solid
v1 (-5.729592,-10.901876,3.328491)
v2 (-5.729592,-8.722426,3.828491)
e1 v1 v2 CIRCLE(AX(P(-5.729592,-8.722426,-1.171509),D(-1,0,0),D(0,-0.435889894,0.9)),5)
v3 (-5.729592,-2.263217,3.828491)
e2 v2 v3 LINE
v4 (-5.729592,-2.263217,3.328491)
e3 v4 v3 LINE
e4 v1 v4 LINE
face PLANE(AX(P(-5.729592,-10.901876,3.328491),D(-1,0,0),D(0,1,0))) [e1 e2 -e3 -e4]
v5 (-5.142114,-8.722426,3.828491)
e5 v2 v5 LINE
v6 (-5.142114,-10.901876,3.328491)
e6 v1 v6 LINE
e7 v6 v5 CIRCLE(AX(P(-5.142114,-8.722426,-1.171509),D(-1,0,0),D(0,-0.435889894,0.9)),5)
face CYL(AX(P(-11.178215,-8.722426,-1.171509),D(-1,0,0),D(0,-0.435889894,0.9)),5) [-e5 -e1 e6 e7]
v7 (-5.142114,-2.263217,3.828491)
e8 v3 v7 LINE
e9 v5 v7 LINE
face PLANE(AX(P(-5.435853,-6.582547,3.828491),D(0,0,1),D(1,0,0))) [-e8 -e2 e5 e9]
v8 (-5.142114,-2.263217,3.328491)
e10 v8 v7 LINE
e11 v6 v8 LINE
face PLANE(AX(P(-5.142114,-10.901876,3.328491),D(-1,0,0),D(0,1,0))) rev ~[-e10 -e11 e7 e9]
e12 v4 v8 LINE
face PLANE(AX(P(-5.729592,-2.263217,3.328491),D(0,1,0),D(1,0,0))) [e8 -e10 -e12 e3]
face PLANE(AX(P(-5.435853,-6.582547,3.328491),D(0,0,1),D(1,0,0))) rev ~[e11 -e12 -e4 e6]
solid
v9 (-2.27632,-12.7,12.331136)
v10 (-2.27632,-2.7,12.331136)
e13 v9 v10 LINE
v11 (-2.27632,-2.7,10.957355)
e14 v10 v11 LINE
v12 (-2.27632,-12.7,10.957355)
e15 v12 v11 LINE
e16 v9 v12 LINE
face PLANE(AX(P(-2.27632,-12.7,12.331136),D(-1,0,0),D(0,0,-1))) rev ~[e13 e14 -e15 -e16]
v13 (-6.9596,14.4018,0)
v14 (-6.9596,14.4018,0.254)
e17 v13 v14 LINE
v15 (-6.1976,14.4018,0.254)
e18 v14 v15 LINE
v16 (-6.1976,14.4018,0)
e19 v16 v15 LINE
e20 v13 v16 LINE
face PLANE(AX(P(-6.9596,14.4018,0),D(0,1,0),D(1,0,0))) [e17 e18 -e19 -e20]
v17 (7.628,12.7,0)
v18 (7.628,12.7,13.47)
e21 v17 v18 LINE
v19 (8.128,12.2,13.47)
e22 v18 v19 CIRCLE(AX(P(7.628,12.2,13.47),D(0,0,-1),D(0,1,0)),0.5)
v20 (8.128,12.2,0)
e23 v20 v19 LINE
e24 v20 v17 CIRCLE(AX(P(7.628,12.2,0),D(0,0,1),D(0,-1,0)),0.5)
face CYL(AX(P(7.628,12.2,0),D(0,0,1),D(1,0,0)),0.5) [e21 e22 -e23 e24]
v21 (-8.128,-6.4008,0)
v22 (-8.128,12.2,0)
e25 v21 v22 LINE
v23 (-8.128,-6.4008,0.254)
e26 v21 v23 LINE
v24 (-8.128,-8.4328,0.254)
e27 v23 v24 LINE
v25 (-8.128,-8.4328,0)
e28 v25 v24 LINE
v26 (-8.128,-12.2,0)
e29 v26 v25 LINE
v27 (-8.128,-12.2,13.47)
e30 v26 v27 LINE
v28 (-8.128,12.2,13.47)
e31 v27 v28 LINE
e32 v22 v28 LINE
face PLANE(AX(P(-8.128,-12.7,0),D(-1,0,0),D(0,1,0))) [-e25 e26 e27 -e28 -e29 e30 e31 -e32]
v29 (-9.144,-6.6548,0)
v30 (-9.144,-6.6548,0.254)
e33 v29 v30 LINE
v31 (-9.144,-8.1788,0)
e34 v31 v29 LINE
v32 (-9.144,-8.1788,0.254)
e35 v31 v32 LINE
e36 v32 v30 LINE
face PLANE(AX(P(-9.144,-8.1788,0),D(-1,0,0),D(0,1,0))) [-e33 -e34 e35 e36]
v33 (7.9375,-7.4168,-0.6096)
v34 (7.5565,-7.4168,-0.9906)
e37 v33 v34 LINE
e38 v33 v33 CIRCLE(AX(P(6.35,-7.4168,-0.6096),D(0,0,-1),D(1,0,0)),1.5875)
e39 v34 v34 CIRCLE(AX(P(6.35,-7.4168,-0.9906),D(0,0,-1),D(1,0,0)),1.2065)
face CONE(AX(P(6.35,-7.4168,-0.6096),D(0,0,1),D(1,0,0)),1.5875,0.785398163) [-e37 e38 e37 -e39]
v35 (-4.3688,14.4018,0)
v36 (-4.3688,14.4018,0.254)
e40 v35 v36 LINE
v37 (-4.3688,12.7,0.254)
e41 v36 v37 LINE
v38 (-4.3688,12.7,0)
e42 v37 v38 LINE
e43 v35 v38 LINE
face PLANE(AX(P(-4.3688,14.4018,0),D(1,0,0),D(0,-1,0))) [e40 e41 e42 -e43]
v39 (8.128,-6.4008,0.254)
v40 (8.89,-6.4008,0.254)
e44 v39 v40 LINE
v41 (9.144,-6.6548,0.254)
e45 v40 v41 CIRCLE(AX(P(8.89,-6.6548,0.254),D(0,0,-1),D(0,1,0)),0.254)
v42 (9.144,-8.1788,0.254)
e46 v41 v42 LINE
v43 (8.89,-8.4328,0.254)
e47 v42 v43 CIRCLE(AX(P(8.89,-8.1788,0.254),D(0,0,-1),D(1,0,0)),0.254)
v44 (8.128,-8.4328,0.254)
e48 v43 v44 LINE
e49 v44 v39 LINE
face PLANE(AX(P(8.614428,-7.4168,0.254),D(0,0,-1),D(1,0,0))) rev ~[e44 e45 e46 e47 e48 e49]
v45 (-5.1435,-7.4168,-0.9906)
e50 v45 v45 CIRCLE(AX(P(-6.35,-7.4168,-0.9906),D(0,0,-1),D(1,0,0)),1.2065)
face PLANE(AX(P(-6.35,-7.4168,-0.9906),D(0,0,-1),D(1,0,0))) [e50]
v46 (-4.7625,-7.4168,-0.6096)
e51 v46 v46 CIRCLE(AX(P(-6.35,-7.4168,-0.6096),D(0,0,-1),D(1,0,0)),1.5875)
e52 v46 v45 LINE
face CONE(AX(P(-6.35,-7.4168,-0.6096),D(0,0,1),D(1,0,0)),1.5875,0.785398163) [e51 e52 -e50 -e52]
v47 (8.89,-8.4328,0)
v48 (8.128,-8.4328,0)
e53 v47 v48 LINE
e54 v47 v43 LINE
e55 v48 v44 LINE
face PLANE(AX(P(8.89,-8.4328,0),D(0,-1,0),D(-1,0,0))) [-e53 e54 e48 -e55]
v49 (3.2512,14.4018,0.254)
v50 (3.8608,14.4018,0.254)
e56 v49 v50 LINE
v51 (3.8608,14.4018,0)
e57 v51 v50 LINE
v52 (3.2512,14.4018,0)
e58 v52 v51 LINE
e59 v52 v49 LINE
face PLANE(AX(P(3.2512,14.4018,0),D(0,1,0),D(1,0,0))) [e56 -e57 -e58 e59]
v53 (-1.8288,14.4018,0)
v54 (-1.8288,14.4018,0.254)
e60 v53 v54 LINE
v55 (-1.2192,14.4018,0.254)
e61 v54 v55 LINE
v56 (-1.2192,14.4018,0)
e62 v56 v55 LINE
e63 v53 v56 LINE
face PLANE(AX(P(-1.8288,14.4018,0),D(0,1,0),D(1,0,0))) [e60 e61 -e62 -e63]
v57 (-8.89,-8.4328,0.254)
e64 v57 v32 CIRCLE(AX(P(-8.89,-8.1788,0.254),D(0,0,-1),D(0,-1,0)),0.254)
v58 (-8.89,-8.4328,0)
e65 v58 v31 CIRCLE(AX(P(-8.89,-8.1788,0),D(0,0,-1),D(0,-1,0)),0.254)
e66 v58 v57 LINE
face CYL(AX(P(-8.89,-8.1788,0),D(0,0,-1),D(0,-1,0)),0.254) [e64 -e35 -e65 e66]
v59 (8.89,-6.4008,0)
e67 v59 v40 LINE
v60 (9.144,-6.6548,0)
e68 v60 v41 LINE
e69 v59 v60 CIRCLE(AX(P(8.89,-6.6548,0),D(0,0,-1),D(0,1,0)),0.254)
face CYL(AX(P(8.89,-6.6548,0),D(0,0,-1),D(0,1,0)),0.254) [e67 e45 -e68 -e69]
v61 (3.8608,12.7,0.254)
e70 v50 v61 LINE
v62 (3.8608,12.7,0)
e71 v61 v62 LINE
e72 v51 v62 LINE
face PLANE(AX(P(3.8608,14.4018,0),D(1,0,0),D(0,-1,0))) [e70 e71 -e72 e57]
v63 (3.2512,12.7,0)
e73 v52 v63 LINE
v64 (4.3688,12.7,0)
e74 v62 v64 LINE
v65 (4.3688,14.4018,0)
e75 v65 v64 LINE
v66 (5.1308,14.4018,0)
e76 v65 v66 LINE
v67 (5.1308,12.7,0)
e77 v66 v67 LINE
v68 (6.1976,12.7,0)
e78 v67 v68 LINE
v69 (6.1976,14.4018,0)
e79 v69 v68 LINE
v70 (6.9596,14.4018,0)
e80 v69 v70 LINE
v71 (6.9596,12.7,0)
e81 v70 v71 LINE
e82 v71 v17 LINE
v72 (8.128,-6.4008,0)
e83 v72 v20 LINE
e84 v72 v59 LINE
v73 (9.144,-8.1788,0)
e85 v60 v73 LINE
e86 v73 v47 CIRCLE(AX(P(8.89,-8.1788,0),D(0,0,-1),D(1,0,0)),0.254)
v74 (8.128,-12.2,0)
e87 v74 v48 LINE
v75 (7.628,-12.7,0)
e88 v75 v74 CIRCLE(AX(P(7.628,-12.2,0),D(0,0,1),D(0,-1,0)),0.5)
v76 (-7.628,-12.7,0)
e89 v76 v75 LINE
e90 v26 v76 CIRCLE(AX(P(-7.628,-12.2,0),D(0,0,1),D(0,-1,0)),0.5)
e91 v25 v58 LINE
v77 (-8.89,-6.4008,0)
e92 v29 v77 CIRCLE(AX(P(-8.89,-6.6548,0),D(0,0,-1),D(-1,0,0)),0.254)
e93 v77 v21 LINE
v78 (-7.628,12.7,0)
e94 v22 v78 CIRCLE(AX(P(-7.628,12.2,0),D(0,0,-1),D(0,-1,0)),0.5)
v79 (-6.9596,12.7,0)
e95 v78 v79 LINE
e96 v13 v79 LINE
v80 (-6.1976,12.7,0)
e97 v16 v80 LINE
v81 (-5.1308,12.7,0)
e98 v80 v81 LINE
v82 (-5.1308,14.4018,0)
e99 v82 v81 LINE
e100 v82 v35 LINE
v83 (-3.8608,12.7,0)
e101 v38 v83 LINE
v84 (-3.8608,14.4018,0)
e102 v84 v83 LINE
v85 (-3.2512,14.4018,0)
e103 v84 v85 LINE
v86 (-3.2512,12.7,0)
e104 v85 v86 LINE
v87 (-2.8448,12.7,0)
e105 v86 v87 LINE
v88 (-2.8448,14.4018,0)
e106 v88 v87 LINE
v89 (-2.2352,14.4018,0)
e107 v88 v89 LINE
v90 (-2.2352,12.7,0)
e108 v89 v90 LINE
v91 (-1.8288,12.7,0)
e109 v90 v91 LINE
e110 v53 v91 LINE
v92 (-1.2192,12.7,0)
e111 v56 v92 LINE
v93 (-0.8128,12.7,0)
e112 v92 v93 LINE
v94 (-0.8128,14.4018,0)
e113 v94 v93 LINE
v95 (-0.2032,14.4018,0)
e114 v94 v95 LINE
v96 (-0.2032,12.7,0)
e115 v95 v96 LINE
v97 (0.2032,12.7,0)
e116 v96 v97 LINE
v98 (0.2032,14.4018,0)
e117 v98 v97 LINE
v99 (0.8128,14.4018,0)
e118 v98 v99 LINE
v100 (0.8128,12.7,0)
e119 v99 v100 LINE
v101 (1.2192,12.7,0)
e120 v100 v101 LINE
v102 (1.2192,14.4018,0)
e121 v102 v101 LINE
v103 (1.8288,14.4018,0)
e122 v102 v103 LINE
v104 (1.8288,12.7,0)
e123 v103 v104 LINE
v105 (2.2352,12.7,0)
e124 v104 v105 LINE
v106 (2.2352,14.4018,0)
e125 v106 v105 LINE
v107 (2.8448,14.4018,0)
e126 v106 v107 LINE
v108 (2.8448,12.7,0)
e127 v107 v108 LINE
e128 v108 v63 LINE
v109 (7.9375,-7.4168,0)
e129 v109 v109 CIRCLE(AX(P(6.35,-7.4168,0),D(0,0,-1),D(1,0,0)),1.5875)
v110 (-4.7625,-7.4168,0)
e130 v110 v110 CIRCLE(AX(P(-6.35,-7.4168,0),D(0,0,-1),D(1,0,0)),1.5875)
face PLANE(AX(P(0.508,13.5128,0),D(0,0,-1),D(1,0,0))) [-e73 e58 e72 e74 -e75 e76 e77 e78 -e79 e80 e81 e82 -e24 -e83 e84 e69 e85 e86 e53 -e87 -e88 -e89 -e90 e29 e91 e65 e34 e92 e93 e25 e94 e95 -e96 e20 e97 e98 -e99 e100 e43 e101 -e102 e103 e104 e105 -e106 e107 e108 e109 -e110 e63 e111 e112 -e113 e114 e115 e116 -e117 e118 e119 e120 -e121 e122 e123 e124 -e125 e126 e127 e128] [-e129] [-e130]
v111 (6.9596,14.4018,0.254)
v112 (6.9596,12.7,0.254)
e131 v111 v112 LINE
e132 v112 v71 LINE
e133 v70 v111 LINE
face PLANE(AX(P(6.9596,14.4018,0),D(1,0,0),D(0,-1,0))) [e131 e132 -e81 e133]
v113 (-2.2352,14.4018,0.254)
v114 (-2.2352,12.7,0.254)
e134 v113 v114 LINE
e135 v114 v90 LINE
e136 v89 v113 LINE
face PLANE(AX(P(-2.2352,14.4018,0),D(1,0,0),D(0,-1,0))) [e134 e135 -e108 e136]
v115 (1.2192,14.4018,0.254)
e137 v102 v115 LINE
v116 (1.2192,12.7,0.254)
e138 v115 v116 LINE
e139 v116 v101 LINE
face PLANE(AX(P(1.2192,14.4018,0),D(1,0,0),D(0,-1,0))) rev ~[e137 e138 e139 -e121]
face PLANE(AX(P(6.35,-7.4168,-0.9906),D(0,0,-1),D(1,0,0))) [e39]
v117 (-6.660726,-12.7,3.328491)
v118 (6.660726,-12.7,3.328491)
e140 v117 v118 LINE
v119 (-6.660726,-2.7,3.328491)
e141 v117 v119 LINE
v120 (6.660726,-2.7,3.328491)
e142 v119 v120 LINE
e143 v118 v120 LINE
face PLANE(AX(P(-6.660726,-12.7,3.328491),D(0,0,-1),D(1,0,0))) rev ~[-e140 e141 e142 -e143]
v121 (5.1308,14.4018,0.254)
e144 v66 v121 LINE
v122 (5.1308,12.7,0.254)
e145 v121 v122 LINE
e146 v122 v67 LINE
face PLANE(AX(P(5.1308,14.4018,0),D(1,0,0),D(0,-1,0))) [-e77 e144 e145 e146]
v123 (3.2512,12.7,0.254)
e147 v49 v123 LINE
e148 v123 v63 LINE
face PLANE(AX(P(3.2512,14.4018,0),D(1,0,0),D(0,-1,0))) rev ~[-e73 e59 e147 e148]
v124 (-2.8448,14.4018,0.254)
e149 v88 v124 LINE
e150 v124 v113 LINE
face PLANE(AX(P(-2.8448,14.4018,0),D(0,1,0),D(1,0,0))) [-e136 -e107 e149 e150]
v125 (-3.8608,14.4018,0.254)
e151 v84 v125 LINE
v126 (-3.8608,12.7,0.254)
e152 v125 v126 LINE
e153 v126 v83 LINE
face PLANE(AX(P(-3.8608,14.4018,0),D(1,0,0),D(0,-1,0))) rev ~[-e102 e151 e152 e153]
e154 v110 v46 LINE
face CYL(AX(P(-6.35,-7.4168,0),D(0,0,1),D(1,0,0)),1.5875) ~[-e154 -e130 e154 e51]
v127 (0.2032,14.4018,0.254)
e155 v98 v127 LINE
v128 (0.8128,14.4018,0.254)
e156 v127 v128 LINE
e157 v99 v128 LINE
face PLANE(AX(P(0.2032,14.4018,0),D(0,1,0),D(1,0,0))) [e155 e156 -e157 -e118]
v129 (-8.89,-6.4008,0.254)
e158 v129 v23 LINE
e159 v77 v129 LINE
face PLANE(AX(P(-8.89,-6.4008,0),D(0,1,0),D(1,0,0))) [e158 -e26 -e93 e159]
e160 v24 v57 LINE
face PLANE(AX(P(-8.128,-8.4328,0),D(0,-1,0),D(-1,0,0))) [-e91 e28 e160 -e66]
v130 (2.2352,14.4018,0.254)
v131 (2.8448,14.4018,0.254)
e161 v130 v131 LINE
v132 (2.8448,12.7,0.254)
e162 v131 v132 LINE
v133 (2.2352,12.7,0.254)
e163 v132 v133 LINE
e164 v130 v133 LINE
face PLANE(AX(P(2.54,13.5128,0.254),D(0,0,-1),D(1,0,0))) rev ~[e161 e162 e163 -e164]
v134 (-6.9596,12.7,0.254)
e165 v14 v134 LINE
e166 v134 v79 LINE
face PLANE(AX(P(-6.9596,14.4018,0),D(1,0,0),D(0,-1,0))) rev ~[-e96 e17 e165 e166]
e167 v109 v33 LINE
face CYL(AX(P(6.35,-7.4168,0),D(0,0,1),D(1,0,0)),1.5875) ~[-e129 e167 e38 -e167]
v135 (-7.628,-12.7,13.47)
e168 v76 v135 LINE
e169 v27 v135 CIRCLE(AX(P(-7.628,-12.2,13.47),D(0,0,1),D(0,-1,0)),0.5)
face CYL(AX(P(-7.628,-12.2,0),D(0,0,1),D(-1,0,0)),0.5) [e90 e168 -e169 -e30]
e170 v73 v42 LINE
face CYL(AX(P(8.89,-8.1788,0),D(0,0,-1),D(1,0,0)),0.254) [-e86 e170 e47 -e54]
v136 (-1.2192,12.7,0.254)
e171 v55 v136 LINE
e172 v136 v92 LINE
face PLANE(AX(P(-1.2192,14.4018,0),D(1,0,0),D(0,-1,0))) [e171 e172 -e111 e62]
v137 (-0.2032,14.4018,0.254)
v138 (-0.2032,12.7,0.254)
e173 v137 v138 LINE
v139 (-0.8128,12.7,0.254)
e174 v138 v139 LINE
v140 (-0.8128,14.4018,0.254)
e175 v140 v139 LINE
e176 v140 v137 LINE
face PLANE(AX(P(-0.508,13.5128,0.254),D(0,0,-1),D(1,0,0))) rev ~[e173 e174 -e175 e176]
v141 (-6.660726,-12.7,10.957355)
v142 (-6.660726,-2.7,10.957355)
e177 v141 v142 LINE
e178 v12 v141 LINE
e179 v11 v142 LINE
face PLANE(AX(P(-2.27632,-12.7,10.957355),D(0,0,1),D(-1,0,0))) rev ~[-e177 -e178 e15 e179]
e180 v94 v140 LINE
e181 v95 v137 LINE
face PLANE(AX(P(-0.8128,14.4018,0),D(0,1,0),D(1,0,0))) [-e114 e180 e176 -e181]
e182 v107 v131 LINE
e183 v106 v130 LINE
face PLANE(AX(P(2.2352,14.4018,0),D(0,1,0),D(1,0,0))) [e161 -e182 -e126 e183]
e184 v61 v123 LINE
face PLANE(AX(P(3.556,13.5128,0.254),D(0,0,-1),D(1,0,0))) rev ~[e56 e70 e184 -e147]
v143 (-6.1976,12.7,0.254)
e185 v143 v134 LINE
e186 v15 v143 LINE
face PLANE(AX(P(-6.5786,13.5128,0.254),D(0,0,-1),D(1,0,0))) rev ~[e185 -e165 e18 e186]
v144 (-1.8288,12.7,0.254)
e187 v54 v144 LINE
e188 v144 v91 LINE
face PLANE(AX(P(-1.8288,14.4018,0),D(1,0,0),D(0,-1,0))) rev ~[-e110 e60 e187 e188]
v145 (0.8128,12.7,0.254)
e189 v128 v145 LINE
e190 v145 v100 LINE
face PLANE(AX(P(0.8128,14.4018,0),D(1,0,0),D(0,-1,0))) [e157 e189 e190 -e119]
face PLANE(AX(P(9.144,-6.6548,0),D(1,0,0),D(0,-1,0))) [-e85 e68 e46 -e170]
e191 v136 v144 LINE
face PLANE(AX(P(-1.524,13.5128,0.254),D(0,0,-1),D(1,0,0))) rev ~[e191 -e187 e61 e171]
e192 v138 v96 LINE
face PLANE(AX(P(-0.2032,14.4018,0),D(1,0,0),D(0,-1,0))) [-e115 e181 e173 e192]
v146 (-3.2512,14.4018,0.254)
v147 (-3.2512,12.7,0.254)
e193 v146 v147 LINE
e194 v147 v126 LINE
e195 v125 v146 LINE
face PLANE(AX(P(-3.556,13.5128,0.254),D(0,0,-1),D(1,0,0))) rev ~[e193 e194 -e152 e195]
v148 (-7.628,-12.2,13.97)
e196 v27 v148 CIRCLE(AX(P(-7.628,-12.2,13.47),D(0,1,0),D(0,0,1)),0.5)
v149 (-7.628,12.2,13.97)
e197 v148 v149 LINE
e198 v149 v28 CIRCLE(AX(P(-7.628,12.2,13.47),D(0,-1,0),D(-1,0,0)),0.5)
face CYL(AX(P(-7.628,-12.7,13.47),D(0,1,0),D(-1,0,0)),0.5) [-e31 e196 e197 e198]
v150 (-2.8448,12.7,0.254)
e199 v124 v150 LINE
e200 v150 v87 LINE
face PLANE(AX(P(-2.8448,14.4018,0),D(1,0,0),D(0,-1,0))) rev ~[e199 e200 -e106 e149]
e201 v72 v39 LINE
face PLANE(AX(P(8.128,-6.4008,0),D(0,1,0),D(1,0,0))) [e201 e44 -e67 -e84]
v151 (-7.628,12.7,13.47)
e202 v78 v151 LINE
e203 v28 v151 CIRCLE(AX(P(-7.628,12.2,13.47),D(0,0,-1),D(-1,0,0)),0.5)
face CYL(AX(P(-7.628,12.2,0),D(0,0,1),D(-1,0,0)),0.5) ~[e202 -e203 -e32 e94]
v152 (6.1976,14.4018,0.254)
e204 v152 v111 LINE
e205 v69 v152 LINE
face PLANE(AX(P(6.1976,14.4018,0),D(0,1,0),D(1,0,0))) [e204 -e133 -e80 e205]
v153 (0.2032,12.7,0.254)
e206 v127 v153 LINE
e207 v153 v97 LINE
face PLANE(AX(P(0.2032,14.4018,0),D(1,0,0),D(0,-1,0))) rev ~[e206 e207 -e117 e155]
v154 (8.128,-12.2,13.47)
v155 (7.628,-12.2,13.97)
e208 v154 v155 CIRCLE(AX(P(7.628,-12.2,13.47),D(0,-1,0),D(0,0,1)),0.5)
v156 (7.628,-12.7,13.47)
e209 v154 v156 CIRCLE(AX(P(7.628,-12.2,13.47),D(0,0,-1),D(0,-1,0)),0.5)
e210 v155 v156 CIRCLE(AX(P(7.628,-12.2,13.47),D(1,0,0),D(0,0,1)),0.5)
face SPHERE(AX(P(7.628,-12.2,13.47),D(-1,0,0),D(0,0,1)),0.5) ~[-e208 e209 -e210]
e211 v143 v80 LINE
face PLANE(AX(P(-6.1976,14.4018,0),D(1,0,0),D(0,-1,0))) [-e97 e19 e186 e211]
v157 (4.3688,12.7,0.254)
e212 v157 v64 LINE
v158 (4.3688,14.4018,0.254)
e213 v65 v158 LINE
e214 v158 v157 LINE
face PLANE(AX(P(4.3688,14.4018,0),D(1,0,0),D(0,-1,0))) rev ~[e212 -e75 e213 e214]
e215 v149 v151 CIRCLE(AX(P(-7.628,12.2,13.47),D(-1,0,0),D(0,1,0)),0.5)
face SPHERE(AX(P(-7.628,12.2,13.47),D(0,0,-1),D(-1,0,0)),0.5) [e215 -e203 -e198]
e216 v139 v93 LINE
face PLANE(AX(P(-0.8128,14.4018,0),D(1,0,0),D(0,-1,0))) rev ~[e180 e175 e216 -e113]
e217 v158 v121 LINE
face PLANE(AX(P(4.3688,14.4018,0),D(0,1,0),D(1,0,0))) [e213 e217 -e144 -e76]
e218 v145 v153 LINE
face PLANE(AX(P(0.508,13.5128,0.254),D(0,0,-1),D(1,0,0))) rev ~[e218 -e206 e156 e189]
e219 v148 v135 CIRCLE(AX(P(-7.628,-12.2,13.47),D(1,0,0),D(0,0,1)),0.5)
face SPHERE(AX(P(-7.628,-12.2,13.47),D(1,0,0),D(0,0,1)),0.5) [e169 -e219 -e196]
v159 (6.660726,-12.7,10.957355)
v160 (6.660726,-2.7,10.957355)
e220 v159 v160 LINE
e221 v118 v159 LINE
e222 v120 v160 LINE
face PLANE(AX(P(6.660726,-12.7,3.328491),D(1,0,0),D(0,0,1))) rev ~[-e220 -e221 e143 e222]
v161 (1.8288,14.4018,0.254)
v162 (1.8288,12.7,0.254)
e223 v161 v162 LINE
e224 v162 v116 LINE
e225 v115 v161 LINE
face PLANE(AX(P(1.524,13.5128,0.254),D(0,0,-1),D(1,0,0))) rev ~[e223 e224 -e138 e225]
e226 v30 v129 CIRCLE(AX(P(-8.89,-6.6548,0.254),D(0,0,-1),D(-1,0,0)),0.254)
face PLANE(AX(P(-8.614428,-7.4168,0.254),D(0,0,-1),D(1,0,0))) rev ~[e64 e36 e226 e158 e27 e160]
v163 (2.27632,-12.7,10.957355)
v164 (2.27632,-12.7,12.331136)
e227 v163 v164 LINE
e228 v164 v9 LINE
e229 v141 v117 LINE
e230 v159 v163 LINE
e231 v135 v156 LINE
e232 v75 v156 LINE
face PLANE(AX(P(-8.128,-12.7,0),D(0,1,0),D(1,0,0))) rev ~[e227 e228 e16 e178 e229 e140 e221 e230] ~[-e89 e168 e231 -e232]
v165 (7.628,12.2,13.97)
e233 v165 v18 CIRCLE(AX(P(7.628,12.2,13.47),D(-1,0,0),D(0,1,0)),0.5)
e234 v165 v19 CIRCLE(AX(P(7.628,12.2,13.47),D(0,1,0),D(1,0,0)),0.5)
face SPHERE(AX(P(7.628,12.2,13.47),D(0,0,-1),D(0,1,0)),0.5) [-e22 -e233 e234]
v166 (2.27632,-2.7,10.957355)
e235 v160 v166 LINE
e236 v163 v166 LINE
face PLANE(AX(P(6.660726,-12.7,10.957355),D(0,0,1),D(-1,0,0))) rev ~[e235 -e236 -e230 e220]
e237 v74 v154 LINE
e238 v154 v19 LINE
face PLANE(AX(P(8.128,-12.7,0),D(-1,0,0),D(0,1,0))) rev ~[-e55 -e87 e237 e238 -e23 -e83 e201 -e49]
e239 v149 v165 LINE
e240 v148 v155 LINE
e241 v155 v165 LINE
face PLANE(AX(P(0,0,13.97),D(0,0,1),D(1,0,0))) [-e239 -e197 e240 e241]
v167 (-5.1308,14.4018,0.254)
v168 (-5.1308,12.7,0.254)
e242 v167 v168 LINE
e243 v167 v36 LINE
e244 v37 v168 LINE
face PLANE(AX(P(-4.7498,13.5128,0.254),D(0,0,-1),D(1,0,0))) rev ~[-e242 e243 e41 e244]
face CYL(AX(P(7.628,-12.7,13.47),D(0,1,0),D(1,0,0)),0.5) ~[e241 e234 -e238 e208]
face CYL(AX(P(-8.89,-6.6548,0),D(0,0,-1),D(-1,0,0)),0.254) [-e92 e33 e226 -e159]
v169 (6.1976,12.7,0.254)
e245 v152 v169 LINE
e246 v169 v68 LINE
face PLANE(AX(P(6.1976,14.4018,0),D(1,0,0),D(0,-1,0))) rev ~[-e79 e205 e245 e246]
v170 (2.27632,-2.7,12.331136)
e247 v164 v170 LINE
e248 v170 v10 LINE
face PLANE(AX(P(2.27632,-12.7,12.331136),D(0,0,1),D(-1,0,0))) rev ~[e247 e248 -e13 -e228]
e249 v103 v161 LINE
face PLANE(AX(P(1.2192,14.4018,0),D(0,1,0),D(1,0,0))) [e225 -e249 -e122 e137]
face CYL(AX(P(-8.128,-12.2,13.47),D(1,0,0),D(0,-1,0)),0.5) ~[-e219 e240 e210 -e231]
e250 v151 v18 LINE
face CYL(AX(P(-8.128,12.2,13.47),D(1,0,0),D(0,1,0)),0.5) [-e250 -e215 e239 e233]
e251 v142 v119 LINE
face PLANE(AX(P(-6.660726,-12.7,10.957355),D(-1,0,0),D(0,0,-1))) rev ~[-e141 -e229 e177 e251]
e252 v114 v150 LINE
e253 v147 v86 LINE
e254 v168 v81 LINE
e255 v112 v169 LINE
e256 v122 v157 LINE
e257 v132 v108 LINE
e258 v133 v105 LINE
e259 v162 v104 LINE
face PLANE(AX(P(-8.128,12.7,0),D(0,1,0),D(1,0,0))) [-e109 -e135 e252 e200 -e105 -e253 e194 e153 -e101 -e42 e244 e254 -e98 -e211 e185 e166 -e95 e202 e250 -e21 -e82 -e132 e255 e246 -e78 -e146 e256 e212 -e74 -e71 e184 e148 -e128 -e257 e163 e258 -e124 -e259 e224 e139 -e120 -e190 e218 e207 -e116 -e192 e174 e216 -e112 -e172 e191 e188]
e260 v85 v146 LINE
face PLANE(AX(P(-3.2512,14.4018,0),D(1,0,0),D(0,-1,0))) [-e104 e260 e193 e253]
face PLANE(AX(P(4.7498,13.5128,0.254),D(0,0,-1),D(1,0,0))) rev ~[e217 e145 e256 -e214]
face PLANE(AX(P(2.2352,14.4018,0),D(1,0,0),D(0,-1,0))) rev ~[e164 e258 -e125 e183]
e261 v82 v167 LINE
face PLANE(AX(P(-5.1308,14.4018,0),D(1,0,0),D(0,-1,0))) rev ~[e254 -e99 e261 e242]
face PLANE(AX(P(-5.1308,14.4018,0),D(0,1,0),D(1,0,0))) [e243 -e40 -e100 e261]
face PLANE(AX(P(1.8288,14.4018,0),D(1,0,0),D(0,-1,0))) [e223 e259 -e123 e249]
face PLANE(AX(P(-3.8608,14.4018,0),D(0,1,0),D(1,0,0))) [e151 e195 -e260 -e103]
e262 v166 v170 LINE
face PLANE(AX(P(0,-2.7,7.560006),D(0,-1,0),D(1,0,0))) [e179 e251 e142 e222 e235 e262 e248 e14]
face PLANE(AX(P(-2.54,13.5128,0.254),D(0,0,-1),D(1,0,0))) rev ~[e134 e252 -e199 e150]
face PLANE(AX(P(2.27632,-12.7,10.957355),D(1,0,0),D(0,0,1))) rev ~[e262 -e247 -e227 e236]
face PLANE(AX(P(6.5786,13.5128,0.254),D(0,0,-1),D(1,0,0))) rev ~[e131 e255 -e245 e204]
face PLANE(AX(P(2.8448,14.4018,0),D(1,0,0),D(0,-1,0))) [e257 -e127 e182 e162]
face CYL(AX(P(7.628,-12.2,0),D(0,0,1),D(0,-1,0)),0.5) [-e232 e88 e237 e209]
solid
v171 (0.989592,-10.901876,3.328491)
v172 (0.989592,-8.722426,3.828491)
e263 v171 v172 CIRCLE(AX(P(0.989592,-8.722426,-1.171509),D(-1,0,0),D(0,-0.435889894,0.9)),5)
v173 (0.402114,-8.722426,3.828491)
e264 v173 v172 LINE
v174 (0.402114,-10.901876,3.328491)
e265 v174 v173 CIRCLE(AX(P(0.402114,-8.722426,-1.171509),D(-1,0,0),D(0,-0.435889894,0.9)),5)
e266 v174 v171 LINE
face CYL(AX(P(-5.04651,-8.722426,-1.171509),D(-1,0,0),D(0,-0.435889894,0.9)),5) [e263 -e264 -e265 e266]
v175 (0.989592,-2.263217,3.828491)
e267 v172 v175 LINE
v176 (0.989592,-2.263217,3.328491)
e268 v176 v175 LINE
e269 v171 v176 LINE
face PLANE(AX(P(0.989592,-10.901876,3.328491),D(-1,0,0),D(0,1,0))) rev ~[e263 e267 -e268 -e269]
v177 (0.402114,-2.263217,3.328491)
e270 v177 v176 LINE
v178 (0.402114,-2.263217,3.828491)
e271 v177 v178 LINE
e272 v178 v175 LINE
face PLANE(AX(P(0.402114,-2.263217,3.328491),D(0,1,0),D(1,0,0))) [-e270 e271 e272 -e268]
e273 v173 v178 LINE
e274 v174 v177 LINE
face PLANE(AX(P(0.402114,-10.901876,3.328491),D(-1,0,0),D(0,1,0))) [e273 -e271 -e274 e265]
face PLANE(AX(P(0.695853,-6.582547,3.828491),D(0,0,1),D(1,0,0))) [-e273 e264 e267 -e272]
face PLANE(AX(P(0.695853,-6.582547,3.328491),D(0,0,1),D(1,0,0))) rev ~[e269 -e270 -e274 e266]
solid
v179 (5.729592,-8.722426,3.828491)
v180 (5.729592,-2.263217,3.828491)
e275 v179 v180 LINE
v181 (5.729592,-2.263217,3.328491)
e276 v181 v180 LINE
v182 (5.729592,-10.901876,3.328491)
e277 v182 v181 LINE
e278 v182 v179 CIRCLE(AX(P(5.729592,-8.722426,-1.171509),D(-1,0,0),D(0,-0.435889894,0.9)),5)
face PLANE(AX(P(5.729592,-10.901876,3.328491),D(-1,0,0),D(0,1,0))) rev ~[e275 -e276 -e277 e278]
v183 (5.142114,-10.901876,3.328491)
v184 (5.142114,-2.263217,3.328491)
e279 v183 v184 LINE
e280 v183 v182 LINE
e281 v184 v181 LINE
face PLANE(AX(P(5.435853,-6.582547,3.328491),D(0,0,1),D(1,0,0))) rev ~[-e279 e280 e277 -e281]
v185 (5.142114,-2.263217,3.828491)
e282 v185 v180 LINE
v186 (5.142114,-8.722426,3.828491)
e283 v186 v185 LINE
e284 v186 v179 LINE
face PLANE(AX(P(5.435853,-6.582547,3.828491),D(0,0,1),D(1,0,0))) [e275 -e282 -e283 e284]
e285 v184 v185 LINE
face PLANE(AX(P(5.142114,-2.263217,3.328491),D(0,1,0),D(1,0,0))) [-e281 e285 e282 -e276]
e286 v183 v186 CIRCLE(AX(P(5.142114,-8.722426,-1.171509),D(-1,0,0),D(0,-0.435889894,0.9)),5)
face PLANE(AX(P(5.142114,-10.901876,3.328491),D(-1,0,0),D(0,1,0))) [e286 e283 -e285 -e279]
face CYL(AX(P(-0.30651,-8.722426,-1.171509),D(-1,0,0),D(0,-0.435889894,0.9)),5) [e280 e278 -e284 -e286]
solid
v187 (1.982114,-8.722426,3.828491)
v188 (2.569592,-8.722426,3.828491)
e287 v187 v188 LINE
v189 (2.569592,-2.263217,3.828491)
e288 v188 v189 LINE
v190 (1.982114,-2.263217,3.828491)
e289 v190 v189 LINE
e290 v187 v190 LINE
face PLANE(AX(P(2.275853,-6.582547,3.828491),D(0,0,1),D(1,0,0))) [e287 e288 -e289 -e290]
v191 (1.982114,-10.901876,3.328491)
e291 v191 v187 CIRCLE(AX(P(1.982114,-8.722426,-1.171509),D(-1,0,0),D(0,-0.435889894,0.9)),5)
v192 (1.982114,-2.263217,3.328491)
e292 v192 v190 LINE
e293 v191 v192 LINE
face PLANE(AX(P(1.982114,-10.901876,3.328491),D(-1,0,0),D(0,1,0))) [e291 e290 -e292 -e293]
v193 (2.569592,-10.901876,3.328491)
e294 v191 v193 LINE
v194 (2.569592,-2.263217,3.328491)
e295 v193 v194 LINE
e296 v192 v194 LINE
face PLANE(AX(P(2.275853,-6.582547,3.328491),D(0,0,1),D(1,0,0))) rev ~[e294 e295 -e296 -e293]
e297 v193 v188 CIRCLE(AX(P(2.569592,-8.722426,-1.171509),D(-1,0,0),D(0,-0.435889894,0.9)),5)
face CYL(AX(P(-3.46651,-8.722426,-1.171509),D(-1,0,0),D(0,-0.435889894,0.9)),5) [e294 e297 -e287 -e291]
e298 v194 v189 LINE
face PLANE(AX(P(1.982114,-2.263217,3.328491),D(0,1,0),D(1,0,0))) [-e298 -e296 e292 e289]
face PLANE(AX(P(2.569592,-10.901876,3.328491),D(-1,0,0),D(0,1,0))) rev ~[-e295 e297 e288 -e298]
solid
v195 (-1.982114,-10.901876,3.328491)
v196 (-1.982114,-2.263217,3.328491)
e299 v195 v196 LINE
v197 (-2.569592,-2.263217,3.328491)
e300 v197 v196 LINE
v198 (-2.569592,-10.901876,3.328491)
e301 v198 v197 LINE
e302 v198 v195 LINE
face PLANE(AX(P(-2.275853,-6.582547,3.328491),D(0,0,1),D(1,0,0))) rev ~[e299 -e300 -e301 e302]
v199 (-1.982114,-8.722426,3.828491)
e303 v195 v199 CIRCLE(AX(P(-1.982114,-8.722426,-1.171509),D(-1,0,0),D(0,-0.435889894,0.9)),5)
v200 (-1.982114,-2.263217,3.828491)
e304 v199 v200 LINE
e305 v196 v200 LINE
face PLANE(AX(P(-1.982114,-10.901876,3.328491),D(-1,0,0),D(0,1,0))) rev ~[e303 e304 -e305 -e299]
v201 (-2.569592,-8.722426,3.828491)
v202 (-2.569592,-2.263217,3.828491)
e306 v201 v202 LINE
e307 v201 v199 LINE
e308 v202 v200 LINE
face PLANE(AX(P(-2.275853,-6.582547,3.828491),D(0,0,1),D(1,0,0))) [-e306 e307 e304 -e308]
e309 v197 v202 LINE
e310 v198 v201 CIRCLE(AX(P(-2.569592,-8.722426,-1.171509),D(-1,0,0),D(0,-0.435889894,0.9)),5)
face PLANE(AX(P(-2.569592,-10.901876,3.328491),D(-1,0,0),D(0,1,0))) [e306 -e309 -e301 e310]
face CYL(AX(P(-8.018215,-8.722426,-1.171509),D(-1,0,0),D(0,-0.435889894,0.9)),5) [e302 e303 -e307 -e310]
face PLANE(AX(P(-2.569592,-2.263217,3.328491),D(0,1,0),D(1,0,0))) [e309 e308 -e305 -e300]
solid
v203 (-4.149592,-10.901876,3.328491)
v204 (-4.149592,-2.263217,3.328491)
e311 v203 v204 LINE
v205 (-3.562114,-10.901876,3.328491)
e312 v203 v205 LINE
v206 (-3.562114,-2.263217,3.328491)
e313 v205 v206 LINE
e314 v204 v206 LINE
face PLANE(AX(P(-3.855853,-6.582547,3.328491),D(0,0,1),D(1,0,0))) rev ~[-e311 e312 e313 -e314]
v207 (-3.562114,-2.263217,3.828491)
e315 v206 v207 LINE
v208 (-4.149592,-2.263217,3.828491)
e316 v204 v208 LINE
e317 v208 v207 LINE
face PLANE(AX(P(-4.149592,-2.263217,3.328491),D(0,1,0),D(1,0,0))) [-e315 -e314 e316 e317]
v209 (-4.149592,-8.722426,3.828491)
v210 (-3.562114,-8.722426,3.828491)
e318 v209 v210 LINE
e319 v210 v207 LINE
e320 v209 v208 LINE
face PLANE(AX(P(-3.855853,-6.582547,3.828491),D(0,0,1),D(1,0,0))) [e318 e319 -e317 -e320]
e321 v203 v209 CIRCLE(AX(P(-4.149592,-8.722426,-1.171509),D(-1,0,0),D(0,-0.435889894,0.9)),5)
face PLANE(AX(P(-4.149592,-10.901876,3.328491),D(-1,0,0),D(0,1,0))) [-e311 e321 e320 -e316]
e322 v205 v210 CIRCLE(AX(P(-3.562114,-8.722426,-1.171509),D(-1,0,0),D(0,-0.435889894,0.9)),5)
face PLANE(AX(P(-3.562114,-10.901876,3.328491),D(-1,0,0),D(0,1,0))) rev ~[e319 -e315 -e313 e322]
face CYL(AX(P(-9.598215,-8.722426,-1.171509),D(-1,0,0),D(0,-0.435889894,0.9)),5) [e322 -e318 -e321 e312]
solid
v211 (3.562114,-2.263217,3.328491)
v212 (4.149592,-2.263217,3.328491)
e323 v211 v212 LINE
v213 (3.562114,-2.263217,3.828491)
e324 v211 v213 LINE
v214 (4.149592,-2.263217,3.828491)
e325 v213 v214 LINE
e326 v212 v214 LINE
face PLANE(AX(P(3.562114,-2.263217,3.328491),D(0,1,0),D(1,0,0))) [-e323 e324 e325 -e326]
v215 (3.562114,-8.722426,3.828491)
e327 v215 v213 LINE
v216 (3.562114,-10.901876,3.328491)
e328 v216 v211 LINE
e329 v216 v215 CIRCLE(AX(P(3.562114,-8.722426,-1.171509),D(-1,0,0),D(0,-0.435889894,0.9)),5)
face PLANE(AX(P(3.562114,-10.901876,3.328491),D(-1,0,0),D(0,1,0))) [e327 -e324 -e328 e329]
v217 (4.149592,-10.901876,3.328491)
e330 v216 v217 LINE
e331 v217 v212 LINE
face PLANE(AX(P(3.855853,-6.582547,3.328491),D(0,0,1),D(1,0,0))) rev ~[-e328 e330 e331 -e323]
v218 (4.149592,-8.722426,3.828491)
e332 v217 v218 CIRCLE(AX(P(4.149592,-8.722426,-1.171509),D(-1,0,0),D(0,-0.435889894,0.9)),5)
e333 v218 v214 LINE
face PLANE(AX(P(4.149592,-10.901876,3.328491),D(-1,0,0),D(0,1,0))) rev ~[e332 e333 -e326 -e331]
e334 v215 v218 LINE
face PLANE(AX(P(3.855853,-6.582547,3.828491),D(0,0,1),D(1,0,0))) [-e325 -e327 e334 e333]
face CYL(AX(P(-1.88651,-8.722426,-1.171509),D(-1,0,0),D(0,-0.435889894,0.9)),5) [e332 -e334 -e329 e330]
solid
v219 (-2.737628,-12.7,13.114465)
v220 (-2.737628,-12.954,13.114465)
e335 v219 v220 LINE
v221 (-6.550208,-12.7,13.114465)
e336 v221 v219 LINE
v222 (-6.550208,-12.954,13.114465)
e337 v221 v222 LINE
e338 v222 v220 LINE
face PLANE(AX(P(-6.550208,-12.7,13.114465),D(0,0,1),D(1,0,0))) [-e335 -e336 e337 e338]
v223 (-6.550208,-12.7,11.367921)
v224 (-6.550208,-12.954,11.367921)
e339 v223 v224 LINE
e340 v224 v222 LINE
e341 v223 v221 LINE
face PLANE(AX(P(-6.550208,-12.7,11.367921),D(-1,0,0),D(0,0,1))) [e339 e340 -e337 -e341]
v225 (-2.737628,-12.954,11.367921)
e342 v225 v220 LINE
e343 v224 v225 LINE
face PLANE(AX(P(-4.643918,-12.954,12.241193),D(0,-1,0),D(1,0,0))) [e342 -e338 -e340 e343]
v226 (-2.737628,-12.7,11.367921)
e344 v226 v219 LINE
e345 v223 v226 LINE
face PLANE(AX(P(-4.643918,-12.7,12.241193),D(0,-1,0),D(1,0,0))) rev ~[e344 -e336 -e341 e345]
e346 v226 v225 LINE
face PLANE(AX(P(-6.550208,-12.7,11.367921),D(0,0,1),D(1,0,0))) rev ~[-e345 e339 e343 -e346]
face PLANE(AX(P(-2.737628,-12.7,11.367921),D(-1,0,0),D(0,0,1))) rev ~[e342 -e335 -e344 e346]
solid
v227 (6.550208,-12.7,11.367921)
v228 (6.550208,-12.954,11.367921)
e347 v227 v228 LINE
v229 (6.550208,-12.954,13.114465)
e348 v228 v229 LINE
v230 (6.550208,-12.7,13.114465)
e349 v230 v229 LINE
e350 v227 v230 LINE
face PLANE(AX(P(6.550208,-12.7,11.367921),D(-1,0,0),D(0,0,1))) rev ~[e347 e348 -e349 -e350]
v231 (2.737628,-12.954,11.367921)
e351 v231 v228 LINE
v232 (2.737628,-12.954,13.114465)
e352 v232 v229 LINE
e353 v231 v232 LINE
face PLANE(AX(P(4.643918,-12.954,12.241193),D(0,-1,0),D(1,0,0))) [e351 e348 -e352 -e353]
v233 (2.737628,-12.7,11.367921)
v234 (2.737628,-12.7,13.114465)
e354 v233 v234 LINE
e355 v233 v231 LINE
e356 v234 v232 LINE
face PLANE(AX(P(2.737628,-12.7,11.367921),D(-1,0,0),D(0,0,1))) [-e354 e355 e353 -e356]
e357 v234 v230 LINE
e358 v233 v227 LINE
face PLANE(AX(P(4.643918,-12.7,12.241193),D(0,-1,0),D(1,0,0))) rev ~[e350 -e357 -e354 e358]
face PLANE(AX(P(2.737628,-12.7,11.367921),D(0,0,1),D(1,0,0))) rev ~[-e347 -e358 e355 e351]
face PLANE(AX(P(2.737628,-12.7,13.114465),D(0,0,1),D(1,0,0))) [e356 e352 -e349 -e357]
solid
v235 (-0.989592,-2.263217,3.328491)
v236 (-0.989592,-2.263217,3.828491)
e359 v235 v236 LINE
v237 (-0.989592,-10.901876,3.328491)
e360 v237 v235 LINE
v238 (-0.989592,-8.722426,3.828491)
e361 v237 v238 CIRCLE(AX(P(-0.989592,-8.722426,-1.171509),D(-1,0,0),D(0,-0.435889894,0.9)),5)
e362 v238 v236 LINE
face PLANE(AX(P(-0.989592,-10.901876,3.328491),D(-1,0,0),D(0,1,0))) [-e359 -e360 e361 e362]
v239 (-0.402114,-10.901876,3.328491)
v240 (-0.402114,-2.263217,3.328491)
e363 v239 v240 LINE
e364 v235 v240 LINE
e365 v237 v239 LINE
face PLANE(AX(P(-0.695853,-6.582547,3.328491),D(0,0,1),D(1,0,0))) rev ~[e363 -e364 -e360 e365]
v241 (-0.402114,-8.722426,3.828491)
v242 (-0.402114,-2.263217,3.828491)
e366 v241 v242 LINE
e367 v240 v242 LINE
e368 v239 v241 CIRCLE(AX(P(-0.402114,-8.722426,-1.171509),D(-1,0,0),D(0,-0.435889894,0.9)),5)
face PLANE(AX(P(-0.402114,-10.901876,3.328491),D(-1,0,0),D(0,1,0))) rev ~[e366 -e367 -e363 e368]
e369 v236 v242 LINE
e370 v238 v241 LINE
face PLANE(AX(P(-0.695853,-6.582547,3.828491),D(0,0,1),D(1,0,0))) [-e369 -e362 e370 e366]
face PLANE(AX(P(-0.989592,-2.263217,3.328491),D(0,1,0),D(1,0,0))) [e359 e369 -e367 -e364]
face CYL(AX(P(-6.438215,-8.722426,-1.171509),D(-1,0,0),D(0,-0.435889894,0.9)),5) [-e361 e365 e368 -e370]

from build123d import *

# Parameters (mm, degrees)
F0_W          = 16.256
F0_H          = 25.4
F1_DEPTH      = 13.97
F2_R          = 0.5
F4_DEPTH      = 10
F5_W          = 0.5874776107
F5_H          = 8.6386585608
F6_DEPTH      = 0.5
F7_T1_DEPTH   = 11.4847249695
F7_2_T1_DEPTH = 11.4847249695
F7_3_T1_DEPTH = 11.4847249695
F7_4_T1_DEPTH = 11.4847249695
F7_5_T1_DEPTH = 11.4847249695
F7_6_T1_DEPTH = 11.4847249695
F7_7_T1_DEPTH = 11.4847249695
F7_8_T1_DEPTH = 11.4847249695
F8_R          = 1.5875
F9_DEPTH      = 0.9906
F10_W         = 0.6096
F10_H         = 1.778
F10_W_2       = 0.762
F11_DEPTH     = 0.254
F12_W         = 3.8125803694
F12_H         = 1.7465446144
F13_DEPTH     = 0.254
F14_SIZE      = 0.381


# Not quite as in the source:
# - a fillet or chamfer that OpenCascade refuses, or shapes differently, is made with other operations: its cross-section is extruded or revolved along the edge and cut away or added


with BuildPart() as f1:
    # F0 (on Top) → F1 (new body)
    with BuildSketch(Plane.XY):
        Rectangle(F0_W, F0_H)
    extrude(amount=F1_DEPTH)

    # F2
    f2_edges = [f1.edges().sort_by_distance(p)[0] for p in [
        (8.128, 12.7, 6.985),
        (-8.128, 12.7, 6.985),
        (0, -12.7, 13.97),
        (-8.128, 0, 13.97),
        (0, 12.7, 13.97),
        (8.128, 0, 13.97),
        (-8.128, -12.7, 6.985),
        (8.128, -12.7, 6.985),
    ]]
    fillet(f2_edges, radius=F2_R)

    # F3 (on face) → F4 (cut)
    with BuildSketch(Plane.XZ.offset(12.7)):
        Polygon((2.2763202433, 12.331135571), (0, 12.331135571), (-2.2763202433, 12.331135571), (-2.2763202433, 10.9573551454), (-6.6607256886, 10.9573551454), (-6.6607256886, 3.3284908859), (0, 3.3284908859), (6.6607256886, 3.3284908859), (6.6607256886, 10.9573551454), (2.2763202433, 10.9573551454), align=None)
    extrude(amount=-F4_DEPTH, mode=Mode.SUBTRACT)

    # F8 (on face) → F9 (join)
    with BuildSketch(Plane(origin=(0, 0, 0), x_dir=(1, 0, 0), z_dir=(0, 0, -1))):
        with Locations((6.35, 7.4168)):
            Circle(F8_R)
        with Locations((-6.35, 7.4168)):
            Circle(F8_R)
    extrude(amount=F9_DEPTH)

    # F10 (on face) → F11 (join)
    with BuildSketch(Plane(origin=(0, 0, 0), x_dir=(1, 0, 0), z_dir=(0, 0, -1))):
        with Locations((0.508, -13.5128)):
            Rectangle(F10_W, F10_H)
        with Locations((1.524, -13.5128)):
            Rectangle(F10_W, F10_H)
        with Locations((2.54, -13.5128)):
            Rectangle(F10_W, F10_H)
        with Locations((3.556, -13.5128)):
            Rectangle(F10_W, F10_H)
        with Locations((4.7498, -13.5128)):
            Rectangle(F10_W_2, F10_H)
        with Locations((6.5786, -13.5128)):
            Rectangle(F10_W_2, F10_H)
        with Locations((-0.508, -13.5128)):
            Rectangle(F10_W, F10_H)
        with Locations((-2.54, -13.5128)):
            Rectangle(F10_W, F10_H)
        with Locations((-1.524, -13.5128)):
            Rectangle(F10_W, F10_H)
        with Locations((-3.556, -13.5128)):
            Rectangle(F10_W, F10_H)
        with Locations((-4.7498, -13.5128)):
            Rectangle(F10_W_2, F10_H)
        with Locations((-6.5786, -13.5128)):
            Rectangle(F10_W_2, F10_H)
        with BuildLine():
            Line((8.89, 8.4328), (8.128, 8.4328))
            Line((8.128, 8.4328), (8.128, 6.4008))
            Line((8.128, 6.4008), (8.89, 6.4008))
            ThreePointArc((8.89, 6.4008), (9.0696051224, 6.4751948776), (9.144, 6.6548))
            Line((9.144, 6.6548), (9.144, 8.1788))
            ThreePointArc((9.144, 8.1788), (9.0696051224, 8.3584051224), (8.89, 8.4328))
        make_face()
        with BuildLine():
            ThreePointArc((-8.89, 8.4328), (-9.0696051224, 8.3584051224), (-9.144, 8.1788))
            Line((-9.144, 8.1788), (-9.144, 6.6548))
            ThreePointArc((-9.144, 6.6548), (-9.0696051224, 6.4751948776), (-8.89, 6.4008))
            Line((-8.89, 6.4008), (-8.128, 6.4008))
            Line((-8.128, 6.4008), (-8.128, 8.4328))
            Line((-8.128, 8.4328), (-8.89, 8.4328))
        make_face()
    extrude(amount=-F11_DEPTH)

    # F14
    f14_edges = [f1.edges().sort_by_distance(p)[0] for p in [
        (4.7625, -7.4168, -0.9906),
        (-7.9375, -7.4168, -0.9906),
    ]]
    chamfer(f14_edges, length=F14_SIZE)


with BuildPart() as f6:
    # F5 (on face) → F6 (new body)
    with BuildSketch(Plane.XY.offset(3.3284908859)):
        with Locations((0.6958528975, -6.5825465135)):
            Rectangle(F5_W, F5_H)
    extrude(amount=F6_DEPTH)

    # F7: fillet of radius 5 on 1 edges, made by hand

    # F7_s2 → F7_t1 (cut)
    with BuildSketch(Plane.YZ.offset(-5.0465095873)):
        with BuildLine():
            ThreePointArc((-10.9018757939, 3.3284908859), (-9.8404603109, 3.7018880583), (-8.7224263222, 3.8284908859))
            Line((-8.7224263222, 3.8284908859), (-10.9018757939, 3.8284908859))
            Line((-10.9018757939, 3.8284908859), (-10.9018757939, 3.3284908859))
        make_face()
    extrude(amount=F7_T1_DEPTH, mode=Mode.SUBTRACT)


with BuildPart() as f6b:
    # F5 (on face) → F6, piece 2 (new body)
    with BuildSketch(Plane.XY.offset(3.3284908859)):
        with Locations((2.2758528975, -6.5825465135)):
            Rectangle(F5_W, F5_H)
    extrude(amount=F6_DEPTH)

    # F7#2: fillet of radius 5 on 1 edges, made by hand

    # F7_2_s2 → F7_2_t1 (cut)
    with BuildSketch(Plane.YZ.offset(-3.4665095873)):
        with BuildLine():
            ThreePointArc((-10.9018757939, 3.3284908859), (-9.8404603109, 3.7018880583), (-8.7224263222, 3.8284908859))
            Line((-8.7224263222, 3.8284908859), (-10.9018757939, 3.8284908859))
            Line((-10.9018757939, 3.8284908859), (-10.9018757939, 3.3284908859))
        make_face()
    extrude(amount=F7_2_T1_DEPTH, mode=Mode.SUBTRACT)


with BuildPart() as f6c:
    # F5 (on face) → F6, piece 3 (new body)
    with BuildSketch(Plane.XY.offset(3.3284908859)):
        with Locations((3.8558528975, -6.5825465135)):
            Rectangle(F5_W, F5_H)
    extrude(amount=F6_DEPTH)

    # F7#3: fillet of radius 5 on 1 edges, made by hand

    # F7_3_s2 → F7_3_t1 (cut)
    with BuildSketch(Plane.YZ.offset(-1.8865095873)):
        with BuildLine():
            ThreePointArc((-10.9018757939, 3.3284908859), (-9.8404603109, 3.7018880583), (-8.7224263222, 3.8284908859))
            Line((-8.7224263222, 3.8284908859), (-10.9018757939, 3.8284908859))
            Line((-10.9018757939, 3.8284908859), (-10.9018757939, 3.3284908859))
        make_face()
    extrude(amount=F7_3_T1_DEPTH, mode=Mode.SUBTRACT)


with BuildPart() as f6d:
    # F5 (on face) → F6, piece 4 (new body)
    with BuildSketch(Plane.XY.offset(3.3284908859)):
        with Locations((5.4358528975, -6.5825465135)):
            Rectangle(F5_W, F5_H)
    extrude(amount=F6_DEPTH)

    # F7#4: fillet of radius 5 on 1 edges, made by hand

    # F7_4_s2 → F7_4_t1 (cut)
    with BuildSketch(Plane.YZ.offset(-0.3065095873)):
        with BuildLine():
            ThreePointArc((-10.9018757939, 3.3284908859), (-9.8404603109, 3.7018880583), (-8.7224263222, 3.8284908859))
            Line((-8.7224263222, 3.8284908859), (-10.9018757939, 3.8284908859))
            Line((-10.9018757939, 3.8284908859), (-10.9018757939, 3.3284908859))
        make_face()
    extrude(amount=F7_4_T1_DEPTH, mode=Mode.SUBTRACT)


with BuildPart() as f6e:
    # F5 (on face) → F6, piece 5 (new body)
    with BuildSketch(Plane.XY.offset(3.3284908859)):
        with Locations((-0.6958528975, -6.5825465135)):
            Rectangle(F5_W, F5_H)
    extrude(amount=F6_DEPTH)

    # F7#5: fillet of radius 5 on 1 edges, made by hand

    # F7_5_s2 → F7_5_t1 (cut)
    with BuildSketch(Plane.YZ.offset(-6.4382153822)):
        with BuildLine():
            ThreePointArc((-10.9018757939, 3.3284908859), (-9.8404603109, 3.7018880583), (-8.7224263222, 3.8284908859))
            Line((-8.7224263222, 3.8284908859), (-10.9018757939, 3.8284908859))
            Line((-10.9018757939, 3.8284908859), (-10.9018757939, 3.3284908859))
        make_face()
    extrude(amount=F7_5_T1_DEPTH, mode=Mode.SUBTRACT)


with BuildPart() as f6f:
    # F5 (on face) → F6, piece 6 (new body)
    with BuildSketch(Plane.XY.offset(3.3284908859)):
        with Locations((-3.8558528975, -6.5825465135)):
            Rectangle(F5_W, F5_H)
    extrude(amount=F6_DEPTH)

    # F7#6: fillet of radius 5 on 1 edges, made by hand

    # F7_6_s2 → F7_6_t1 (cut)
    with BuildSketch(Plane.YZ.offset(-9.5982153822)):
        with BuildLine():
            ThreePointArc((-10.9018757939, 3.3284908859), (-9.8404603109, 3.7018880583), (-8.7224263222, 3.8284908859))
            Line((-8.7224263222, 3.8284908859), (-10.9018757939, 3.8284908859))
            Line((-10.9018757939, 3.8284908859), (-10.9018757939, 3.3284908859))
        make_face()
    extrude(amount=F7_6_T1_DEPTH, mode=Mode.SUBTRACT)


with BuildPart() as f6g:
    # F5 (on face) → F6, piece 7 (new body)
    with BuildSketch(Plane.XY.offset(3.3284908859)):
        with Locations((-2.2758528975, -6.5825465135)):
            Rectangle(F5_W, F5_H)
    extrude(amount=F6_DEPTH)

    # F7#7: fillet of radius 5 on 1 edges, made by hand

    # F7_7_s2 → F7_7_t1 (cut)
    with BuildSketch(Plane.YZ.offset(-8.0182153822)):
        with BuildLine():
            ThreePointArc((-10.9018757939, 3.3284908859), (-9.8404603109, 3.7018880583), (-8.7224263222, 3.8284908859))
            Line((-8.7224263222, 3.8284908859), (-10.9018757939, 3.8284908859))
            Line((-10.9018757939, 3.8284908859), (-10.9018757939, 3.3284908859))
        make_face()
    extrude(amount=F7_7_T1_DEPTH, mode=Mode.SUBTRACT)


with BuildPart() as f6h:
    # F5 (on face) → F6, piece 8 (new body)
    with BuildSketch(Plane.XY.offset(3.3284908859)):
        with Locations((-5.4358528975, -6.5825465135)):
            Rectangle(F5_W, F5_H)
    extrude(amount=F6_DEPTH)

    # F7#8: fillet of radius 5 on 1 edges, made by hand

    # F7_8_s2 → F7_8_t1 (cut)
    with BuildSketch(Plane.YZ.offset(-11.1782153822)):
        with BuildLine():
            ThreePointArc((-10.9018757939, 3.3284908859), (-9.8404603109, 3.7018880583), (-8.7224263222, 3.8284908859))
            Line((-8.7224263222, 3.8284908859), (-10.9018757939, 3.8284908859))
            Line((-10.9018757939, 3.8284908859), (-10.9018757939, 3.3284908859))
        make_face()
    extrude(amount=F7_8_T1_DEPTH, mode=Mode.SUBTRACT)


with BuildPart() as f13:
    # F12 (on face) → F13 (new body)
    with BuildSketch(Plane.XZ.offset(12.7)):
        with Locations((-4.6439180151, 12.2411930934)):
            Rectangle(F12_W, F12_H)
    extrude(amount=F13_DEPTH)


with BuildPart() as f13b:
    # F12 (on face) → F13, piece 2 (new body)
    with BuildSketch(Plane.XZ.offset(12.7)):
        with Locations((4.6439180151, 12.2411930934)):
            Rectangle(F12_W, F12_H)
    extrude(amount=F13_DEPTH)


solid = Compound([f1.part, f6.part, f6b.part, f6c.part, f6d.part, f6e.part, f6f.part, f6g.part, f6h.part, f13.part, f13b.part])
